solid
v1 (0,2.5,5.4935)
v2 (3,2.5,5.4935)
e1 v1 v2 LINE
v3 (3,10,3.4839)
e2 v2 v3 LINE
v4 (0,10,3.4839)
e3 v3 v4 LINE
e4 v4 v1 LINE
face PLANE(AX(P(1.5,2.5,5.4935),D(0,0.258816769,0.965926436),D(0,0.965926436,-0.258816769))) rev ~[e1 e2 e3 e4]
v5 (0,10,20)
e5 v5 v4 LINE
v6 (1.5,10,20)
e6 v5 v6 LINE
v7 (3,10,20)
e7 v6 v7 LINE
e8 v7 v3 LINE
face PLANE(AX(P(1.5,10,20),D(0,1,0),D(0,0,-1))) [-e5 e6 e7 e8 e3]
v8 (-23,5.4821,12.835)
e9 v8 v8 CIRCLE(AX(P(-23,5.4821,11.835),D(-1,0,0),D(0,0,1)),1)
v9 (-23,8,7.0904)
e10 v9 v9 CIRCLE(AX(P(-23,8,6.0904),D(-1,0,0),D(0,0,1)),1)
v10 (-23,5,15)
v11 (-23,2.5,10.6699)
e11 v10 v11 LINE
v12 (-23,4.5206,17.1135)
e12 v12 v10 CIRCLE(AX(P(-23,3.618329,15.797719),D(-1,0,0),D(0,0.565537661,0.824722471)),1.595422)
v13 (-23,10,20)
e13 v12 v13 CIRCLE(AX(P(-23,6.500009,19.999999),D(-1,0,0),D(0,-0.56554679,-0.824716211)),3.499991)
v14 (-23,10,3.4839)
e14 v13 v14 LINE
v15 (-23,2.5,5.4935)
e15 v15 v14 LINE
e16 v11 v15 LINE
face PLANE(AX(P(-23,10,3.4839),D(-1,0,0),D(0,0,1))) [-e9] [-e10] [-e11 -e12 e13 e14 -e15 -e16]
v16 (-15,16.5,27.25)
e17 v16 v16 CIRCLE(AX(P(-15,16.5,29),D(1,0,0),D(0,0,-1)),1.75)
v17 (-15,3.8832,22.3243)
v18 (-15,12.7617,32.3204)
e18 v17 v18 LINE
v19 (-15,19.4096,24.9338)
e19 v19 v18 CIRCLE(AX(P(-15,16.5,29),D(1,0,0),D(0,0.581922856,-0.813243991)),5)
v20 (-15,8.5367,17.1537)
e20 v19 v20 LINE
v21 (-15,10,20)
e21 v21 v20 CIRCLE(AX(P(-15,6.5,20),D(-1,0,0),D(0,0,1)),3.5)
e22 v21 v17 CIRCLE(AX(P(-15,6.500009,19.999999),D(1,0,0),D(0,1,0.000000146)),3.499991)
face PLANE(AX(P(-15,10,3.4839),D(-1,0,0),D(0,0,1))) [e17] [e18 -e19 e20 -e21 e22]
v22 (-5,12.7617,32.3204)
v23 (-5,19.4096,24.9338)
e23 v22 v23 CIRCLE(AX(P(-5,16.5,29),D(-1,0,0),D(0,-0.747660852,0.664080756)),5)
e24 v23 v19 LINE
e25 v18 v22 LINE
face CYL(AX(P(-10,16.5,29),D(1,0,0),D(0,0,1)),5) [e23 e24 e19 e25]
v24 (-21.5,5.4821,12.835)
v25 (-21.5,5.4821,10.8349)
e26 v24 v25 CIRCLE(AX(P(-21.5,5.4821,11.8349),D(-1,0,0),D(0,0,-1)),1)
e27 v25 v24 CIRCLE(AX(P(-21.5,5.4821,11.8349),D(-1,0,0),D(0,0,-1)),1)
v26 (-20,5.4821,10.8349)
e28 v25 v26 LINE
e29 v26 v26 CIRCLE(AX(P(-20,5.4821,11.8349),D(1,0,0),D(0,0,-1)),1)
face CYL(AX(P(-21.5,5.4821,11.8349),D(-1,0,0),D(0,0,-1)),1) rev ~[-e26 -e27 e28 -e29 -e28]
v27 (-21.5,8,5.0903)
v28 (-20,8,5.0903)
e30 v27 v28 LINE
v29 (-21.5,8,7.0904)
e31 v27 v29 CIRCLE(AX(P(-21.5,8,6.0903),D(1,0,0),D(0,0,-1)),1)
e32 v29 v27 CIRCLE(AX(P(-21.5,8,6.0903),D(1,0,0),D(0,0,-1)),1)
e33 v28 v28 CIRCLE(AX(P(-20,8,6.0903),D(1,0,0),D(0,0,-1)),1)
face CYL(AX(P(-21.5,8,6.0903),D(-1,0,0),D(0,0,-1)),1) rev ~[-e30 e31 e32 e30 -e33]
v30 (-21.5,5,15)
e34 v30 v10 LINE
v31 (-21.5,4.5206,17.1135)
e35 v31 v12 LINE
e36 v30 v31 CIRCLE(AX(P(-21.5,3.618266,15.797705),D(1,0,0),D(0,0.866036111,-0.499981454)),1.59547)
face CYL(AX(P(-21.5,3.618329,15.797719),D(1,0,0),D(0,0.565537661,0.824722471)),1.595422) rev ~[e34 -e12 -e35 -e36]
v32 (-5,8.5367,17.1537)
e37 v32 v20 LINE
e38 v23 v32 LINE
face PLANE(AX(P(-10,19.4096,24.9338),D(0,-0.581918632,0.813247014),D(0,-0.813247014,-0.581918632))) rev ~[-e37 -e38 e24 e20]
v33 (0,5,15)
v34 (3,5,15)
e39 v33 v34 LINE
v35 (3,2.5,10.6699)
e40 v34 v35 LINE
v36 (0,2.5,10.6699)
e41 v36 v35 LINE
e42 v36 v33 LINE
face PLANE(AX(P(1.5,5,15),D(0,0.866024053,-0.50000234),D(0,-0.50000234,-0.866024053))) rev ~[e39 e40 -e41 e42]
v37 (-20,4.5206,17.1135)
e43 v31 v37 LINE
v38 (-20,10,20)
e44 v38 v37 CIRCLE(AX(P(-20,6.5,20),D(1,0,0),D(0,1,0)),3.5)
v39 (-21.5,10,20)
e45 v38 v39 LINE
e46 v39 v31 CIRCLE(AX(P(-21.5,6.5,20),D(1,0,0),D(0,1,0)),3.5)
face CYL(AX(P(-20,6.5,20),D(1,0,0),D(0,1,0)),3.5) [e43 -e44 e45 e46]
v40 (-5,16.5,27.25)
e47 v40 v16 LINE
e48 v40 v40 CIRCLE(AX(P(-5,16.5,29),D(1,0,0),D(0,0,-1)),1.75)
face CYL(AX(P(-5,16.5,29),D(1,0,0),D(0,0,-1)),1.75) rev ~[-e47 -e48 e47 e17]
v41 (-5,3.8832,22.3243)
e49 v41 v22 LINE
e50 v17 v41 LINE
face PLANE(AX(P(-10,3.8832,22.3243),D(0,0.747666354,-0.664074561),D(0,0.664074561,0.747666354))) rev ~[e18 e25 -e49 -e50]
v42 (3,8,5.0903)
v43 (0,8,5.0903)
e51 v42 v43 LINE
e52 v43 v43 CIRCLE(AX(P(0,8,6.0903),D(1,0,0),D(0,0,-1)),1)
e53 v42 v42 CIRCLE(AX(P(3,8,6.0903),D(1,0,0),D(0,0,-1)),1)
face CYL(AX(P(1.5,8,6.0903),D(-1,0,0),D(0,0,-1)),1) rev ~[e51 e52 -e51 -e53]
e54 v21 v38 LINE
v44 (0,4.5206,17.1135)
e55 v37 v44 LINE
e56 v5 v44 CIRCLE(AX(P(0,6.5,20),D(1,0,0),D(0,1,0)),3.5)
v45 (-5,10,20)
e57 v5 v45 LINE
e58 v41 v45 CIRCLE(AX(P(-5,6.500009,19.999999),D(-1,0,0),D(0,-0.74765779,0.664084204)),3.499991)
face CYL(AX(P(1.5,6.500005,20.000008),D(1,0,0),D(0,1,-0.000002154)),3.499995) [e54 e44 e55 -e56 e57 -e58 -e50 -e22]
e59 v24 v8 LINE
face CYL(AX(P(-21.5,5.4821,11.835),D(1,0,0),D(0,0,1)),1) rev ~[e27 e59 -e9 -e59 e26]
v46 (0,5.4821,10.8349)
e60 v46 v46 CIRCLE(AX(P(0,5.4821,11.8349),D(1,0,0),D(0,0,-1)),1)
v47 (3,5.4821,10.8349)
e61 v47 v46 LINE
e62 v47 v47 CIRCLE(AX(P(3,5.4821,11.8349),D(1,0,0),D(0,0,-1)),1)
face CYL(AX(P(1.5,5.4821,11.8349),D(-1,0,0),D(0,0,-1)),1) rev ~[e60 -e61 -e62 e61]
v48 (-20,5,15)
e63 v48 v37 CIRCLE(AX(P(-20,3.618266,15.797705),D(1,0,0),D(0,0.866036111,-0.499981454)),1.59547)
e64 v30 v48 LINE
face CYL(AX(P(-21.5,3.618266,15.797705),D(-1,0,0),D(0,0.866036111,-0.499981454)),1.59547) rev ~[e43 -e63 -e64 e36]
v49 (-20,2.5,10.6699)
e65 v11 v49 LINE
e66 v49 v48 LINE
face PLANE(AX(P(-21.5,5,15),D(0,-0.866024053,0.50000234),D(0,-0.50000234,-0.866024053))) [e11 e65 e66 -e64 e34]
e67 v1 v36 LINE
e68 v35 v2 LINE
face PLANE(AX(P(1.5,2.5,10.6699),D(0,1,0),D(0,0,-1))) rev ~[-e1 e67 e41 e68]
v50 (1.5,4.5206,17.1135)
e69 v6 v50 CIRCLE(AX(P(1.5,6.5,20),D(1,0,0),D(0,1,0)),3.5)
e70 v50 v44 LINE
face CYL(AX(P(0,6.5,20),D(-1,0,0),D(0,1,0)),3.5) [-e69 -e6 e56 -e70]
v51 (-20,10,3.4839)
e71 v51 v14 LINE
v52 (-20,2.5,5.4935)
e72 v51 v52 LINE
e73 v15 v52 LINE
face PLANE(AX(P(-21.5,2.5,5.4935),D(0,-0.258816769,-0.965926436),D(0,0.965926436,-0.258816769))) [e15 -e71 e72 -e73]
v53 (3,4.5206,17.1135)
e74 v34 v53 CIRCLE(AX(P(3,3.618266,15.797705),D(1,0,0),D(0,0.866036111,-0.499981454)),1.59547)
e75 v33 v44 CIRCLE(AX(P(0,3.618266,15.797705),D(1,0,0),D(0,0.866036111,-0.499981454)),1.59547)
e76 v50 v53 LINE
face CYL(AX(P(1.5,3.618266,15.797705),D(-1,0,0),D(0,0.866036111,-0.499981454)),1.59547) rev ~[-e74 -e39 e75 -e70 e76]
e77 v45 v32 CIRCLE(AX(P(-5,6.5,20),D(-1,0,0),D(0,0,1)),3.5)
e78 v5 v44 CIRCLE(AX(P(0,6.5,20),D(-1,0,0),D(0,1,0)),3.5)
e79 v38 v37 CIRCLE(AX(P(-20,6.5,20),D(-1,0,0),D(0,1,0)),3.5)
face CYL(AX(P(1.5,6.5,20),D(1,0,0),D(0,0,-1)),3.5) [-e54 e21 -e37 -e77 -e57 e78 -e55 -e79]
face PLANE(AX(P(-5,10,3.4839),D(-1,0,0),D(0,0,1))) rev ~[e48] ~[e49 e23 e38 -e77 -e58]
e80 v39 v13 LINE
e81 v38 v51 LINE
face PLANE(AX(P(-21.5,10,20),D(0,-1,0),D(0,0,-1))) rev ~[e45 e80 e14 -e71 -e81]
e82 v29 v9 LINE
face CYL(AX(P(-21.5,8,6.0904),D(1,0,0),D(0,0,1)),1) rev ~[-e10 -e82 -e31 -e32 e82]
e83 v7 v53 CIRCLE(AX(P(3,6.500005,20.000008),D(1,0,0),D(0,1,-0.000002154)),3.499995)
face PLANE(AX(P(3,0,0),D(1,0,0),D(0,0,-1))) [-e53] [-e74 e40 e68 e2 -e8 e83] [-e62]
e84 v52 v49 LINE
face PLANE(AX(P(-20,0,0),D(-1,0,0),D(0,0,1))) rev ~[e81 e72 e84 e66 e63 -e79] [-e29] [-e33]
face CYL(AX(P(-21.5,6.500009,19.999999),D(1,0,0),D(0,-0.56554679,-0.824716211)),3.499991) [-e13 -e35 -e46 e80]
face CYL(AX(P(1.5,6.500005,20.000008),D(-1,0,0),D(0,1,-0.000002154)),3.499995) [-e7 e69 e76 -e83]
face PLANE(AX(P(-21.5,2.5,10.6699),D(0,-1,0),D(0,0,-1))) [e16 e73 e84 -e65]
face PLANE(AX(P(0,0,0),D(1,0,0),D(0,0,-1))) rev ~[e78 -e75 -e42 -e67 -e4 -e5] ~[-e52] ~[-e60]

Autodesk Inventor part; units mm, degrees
ref_plane "YZ Plane" through (0, 0, 0) normal (1, 0, 0) x (0, 1, 0)
ref_plane "XZ Plane" through (0, 0, 0) normal (0, 1, 0) x (-1, 0, 0)
sketch "スケッチ1" plane through (0, 0, 0) normal (1, 0, 0) x (0, 1, 0)
  line L0 (0, 0) -> (10, 0)
  line L1 (10, 0) -> (10, 15)
  line L2 (10, 15) -> (0, 15)
  line L3 (0, 15) -> (0, 0)
  circle A0 centre (6.5, 20) radius 1.6
  circle A1 centre (6.5, 20) radius 3.5
  line L4 (10, 15) -> (-0.0411, 15)
  dimension "d0" = 10
  dimension "d1" = 15
  dimension "d2" = 3.2
  dimension "d3" = 7
  dimension "d7" = 5
extrude "プレート1" add sketch "スケッチ1" along normal blind 1.5
sketch "スケッチ2" plane through (1.5, 0, 0) normal (1, 0, 0) x (0, 0, -1)
  line L0 (-15, 5) -> (-15, 10) projected
  line L1 (-15, 10) -> (-3.4839, 10) projected
  line L2 (-3.4839, 10) -> (-5.4935, 2.5) projected
  line L3 (-5.4935, 2.5) -> (-10.6699, 2.5) projected
  line L4 (-10.6699, 2.5) -> (-15, 5) projected
  line L5 (-15, 10) -> (0, 10) projected
  line L6 (-15, 0) -> (-15, 10) projected
  line L7 (0, 0) -> (-15, 0) projected
  line L8 (0, 10) -> (0, 0) projected
extrude "切り取り1" cut sketch "スケッチ2" against normal blind 1.5 contours L4 L3 L2 L5 L8 L7 L6
sketch "スケッチ3" plane through (1.5, 0, 0) normal (1, 0, 0) x (0, 0, -1)
  line L0 (-3.4839, 10) -> (-15, 10)
  line L1 (-15, 10) -> (-20, 10)
  circle A0 centre (-20, 6.5) radius 3.5
  line L2 (-10.6699, 2.5) -> (-15, 5)
  arc A1 (-15, 5) -> (-17.1135, 4.5206) centre (-15.7977, 3.6183) ccw
  line L3 (-15, 5) -> (-10.6699, 2.5)
  circle A2 centre (-20, 6.5) radius 3.5
  line L4 (-15, 5) -> (-15, 10)
  point P0 (0, 0)
  dimension "d13" = 1.5
sheet face with bend "面2" sketch "スケッチ3" thickness 1.5 toward (-1, 0, 0) bend radius 1.5 contours L4 A1 A0 L1
bend "曲げ1"
sketch "スケッチ4" plane through (1.5, 0, 0) normal (1, 0, 0) x (0, 0, -1)
  circle A0 centre (-6.0903, 8) radius 1
  line L0 (-20, 10) -> (-3.4839, 10) projected
  line L1 (-5.4935, 2.5) -> (-3.4839, 10) projected
  circle A1 centre (-11.8349, 5.4821) radius 1
  line L2 (-15, 5) -> (-10.6699, 2.5) projected
  line L3 (-11.8349, 5.4821) -> (-12.8349, 3.75)
  point P0 (0, 0)
  dimension "d14" = 2
  dimension "d15" = 2
  dimension "d16" = 2
  dimension "d17" = 2
extrude "切り取り2" cut sketch "スケッチ4" against normal blind 1.5
sketch "スケッチ5" plane through (1.5, 0, 0) normal (1, 0, 0) x (0, 0, -1)
  circle A0 centre (-20, 6.5) radius 3.5
  arc A1 (-20, 10) -> (-17.1135, 4.5206) centre (-20, 6.5) ccw projected
  point P0 (0, 0)
extrude "押し出し1" add sketch "スケッチ5" against normal blind 11.5
mirror "ミラー1" about plane through (-10, 6.5, 20) normal (-1, 0, 0)
sketch "スケッチ6" plane through (1.5, 0, 0) normal (1, 0, 0) x (0, 0, -1)
  arc A0 (-15, 5) -> (-17.1135, 4.5206) centre (-15.7977, 3.6183) ccw projected
  line L0 (-15, 5) -> (-10.6699, 2.5) projected
  line L1 (-10.6699, 2.5) -> (-5.4935, 2.5) projected
  line L2 (-5.4935, 2.5) -> (-3.4839, 10) projected
  line L3 (-20, 10) -> (-3.4839, 10) projected
  arc A1 (-20, 10) -> (-17.1135, 4.5206) centre (-20, 6.5) ccw projected
  circle A2 centre (-6.0903, 8) radius 1 projected
  circle A3 centre (-11.8349, 5.4821) radius 1 projected
  point P0 (0, 0)
extrude "押し出し2" add sketch "スケッチ6" along normal blind 1.5
sketch "スケッチ7" plane through (-21.5, 10, 3.4839) normal (-1, 0, 0) x (0, 0, 1)
  arc A0 (13.6296, -5.4794) -> (11.5161, -5) centre (12.3138, -6.3817) ccw projected
  arc A1 (13.6296, -5.4794) -> (16.5161, 0) centre (16.5161, -3.5) ccw projected
  line L0 (16.5161, 0) -> (0, 0) projected
  line L1 (2.0096, -7.5) -> (0, 0) projected
  line L2 (7.186, -7.5) -> (2.0096, -7.5) projected
  line L3 (11.5161, -5) -> (7.186, -7.5) projected
  circle A2 centre (2.6065, -2) radius 1 projected
  circle A3 centre (8.3511, -4.5179) radius 1 projected
  point P0 (-3.4839, -10)
extrude "押し出し3" add sketch "スケッチ7" along normal blind 1.5
ref_plane "作業平面1" through (-10, 10, 3.4839) normal (-1, 0, 0) x (0, 0, 1)
sketch "スケッチ8" plane through (-10, 10, 3.4839) normal (-1, 0, 0) x (0, 0, 1)
  circle A0 centre (25.5161, 6.5) radius 5
  arc A1 (13.6296, -5.4794) -> (16.5161, 0) centre (16.5161, -3.5) ccw projected
  line L0 (18.8404, -6.1168) -> (28.8365, 2.7617)
  line L1 (21.4499, 9.4096) -> (13.6698, -1.4633)
  circle A2 centre (16.5161, -3.5) radius 3.5
  arc A3 (16.5161, 0) -> (13.6296, -5.4794) centre (16.5161, -3.5) ccw projected
  point P0 (-3.4839, -10)
  point P1 (13.6698, -1.4633)
  dimension "d26" = 10
  dimension "d27" = 10
  dimension "d28" = 9
extrude "押し出し4" add sketch "スケッチ8" along normal mid plane 10 contours A0 | A0 L0 A1 A2 L1
sketch "スケッチ9" plane through (-5, 10, 3.4839) normal (1, 0, 0) x (0, 0, -1)
  arc A0 (-21.4499, 9.4096) -> (-28.8365, 2.7617) centre (-25.5161, 6.5) ccw projected
  circle A1 centre (-25.5161, 6.5) radius 1.75
  point P0 (3.4839, -10)
  dimension "d31" = 3.5
extrude "押し出し5" cut sketch "スケッチ9" against normal through all
equation "\"d5\" = Thickness"
equation "\"d17\" = d16"
equation "\"d18\" = Thickness"
equation "\"d4\" = Thickness"
equation "\"d8\" = BendRadius"
equation "\"d9\" = BendReliefWidth"
equation "\"d11\" = MinimumRemnant"
equation "\"d10\" = BendReliefDepth"
equation "\"d12\" = TransitionRadius"
equation "\"BendRadius\" = Thickness"
equation "\"BendReliefWidth\" = Thickness"
equation "\"BendReliefDepth\" = 0.5 * Thickness"
equation "\"CornerReliefSize\" = 4 * Thickness"
equation "\"MinimumRemnant\" = 2 * Thickness"
equation "\"TransitionRadius\" = BendRadius"
equation "\"JacobiRadiusSize\" = BendRadius"
equation "\"GapSize\" = Thickness"
equation "\"Thickness\" = 1.5"
properties part number "board_setter_joint"
